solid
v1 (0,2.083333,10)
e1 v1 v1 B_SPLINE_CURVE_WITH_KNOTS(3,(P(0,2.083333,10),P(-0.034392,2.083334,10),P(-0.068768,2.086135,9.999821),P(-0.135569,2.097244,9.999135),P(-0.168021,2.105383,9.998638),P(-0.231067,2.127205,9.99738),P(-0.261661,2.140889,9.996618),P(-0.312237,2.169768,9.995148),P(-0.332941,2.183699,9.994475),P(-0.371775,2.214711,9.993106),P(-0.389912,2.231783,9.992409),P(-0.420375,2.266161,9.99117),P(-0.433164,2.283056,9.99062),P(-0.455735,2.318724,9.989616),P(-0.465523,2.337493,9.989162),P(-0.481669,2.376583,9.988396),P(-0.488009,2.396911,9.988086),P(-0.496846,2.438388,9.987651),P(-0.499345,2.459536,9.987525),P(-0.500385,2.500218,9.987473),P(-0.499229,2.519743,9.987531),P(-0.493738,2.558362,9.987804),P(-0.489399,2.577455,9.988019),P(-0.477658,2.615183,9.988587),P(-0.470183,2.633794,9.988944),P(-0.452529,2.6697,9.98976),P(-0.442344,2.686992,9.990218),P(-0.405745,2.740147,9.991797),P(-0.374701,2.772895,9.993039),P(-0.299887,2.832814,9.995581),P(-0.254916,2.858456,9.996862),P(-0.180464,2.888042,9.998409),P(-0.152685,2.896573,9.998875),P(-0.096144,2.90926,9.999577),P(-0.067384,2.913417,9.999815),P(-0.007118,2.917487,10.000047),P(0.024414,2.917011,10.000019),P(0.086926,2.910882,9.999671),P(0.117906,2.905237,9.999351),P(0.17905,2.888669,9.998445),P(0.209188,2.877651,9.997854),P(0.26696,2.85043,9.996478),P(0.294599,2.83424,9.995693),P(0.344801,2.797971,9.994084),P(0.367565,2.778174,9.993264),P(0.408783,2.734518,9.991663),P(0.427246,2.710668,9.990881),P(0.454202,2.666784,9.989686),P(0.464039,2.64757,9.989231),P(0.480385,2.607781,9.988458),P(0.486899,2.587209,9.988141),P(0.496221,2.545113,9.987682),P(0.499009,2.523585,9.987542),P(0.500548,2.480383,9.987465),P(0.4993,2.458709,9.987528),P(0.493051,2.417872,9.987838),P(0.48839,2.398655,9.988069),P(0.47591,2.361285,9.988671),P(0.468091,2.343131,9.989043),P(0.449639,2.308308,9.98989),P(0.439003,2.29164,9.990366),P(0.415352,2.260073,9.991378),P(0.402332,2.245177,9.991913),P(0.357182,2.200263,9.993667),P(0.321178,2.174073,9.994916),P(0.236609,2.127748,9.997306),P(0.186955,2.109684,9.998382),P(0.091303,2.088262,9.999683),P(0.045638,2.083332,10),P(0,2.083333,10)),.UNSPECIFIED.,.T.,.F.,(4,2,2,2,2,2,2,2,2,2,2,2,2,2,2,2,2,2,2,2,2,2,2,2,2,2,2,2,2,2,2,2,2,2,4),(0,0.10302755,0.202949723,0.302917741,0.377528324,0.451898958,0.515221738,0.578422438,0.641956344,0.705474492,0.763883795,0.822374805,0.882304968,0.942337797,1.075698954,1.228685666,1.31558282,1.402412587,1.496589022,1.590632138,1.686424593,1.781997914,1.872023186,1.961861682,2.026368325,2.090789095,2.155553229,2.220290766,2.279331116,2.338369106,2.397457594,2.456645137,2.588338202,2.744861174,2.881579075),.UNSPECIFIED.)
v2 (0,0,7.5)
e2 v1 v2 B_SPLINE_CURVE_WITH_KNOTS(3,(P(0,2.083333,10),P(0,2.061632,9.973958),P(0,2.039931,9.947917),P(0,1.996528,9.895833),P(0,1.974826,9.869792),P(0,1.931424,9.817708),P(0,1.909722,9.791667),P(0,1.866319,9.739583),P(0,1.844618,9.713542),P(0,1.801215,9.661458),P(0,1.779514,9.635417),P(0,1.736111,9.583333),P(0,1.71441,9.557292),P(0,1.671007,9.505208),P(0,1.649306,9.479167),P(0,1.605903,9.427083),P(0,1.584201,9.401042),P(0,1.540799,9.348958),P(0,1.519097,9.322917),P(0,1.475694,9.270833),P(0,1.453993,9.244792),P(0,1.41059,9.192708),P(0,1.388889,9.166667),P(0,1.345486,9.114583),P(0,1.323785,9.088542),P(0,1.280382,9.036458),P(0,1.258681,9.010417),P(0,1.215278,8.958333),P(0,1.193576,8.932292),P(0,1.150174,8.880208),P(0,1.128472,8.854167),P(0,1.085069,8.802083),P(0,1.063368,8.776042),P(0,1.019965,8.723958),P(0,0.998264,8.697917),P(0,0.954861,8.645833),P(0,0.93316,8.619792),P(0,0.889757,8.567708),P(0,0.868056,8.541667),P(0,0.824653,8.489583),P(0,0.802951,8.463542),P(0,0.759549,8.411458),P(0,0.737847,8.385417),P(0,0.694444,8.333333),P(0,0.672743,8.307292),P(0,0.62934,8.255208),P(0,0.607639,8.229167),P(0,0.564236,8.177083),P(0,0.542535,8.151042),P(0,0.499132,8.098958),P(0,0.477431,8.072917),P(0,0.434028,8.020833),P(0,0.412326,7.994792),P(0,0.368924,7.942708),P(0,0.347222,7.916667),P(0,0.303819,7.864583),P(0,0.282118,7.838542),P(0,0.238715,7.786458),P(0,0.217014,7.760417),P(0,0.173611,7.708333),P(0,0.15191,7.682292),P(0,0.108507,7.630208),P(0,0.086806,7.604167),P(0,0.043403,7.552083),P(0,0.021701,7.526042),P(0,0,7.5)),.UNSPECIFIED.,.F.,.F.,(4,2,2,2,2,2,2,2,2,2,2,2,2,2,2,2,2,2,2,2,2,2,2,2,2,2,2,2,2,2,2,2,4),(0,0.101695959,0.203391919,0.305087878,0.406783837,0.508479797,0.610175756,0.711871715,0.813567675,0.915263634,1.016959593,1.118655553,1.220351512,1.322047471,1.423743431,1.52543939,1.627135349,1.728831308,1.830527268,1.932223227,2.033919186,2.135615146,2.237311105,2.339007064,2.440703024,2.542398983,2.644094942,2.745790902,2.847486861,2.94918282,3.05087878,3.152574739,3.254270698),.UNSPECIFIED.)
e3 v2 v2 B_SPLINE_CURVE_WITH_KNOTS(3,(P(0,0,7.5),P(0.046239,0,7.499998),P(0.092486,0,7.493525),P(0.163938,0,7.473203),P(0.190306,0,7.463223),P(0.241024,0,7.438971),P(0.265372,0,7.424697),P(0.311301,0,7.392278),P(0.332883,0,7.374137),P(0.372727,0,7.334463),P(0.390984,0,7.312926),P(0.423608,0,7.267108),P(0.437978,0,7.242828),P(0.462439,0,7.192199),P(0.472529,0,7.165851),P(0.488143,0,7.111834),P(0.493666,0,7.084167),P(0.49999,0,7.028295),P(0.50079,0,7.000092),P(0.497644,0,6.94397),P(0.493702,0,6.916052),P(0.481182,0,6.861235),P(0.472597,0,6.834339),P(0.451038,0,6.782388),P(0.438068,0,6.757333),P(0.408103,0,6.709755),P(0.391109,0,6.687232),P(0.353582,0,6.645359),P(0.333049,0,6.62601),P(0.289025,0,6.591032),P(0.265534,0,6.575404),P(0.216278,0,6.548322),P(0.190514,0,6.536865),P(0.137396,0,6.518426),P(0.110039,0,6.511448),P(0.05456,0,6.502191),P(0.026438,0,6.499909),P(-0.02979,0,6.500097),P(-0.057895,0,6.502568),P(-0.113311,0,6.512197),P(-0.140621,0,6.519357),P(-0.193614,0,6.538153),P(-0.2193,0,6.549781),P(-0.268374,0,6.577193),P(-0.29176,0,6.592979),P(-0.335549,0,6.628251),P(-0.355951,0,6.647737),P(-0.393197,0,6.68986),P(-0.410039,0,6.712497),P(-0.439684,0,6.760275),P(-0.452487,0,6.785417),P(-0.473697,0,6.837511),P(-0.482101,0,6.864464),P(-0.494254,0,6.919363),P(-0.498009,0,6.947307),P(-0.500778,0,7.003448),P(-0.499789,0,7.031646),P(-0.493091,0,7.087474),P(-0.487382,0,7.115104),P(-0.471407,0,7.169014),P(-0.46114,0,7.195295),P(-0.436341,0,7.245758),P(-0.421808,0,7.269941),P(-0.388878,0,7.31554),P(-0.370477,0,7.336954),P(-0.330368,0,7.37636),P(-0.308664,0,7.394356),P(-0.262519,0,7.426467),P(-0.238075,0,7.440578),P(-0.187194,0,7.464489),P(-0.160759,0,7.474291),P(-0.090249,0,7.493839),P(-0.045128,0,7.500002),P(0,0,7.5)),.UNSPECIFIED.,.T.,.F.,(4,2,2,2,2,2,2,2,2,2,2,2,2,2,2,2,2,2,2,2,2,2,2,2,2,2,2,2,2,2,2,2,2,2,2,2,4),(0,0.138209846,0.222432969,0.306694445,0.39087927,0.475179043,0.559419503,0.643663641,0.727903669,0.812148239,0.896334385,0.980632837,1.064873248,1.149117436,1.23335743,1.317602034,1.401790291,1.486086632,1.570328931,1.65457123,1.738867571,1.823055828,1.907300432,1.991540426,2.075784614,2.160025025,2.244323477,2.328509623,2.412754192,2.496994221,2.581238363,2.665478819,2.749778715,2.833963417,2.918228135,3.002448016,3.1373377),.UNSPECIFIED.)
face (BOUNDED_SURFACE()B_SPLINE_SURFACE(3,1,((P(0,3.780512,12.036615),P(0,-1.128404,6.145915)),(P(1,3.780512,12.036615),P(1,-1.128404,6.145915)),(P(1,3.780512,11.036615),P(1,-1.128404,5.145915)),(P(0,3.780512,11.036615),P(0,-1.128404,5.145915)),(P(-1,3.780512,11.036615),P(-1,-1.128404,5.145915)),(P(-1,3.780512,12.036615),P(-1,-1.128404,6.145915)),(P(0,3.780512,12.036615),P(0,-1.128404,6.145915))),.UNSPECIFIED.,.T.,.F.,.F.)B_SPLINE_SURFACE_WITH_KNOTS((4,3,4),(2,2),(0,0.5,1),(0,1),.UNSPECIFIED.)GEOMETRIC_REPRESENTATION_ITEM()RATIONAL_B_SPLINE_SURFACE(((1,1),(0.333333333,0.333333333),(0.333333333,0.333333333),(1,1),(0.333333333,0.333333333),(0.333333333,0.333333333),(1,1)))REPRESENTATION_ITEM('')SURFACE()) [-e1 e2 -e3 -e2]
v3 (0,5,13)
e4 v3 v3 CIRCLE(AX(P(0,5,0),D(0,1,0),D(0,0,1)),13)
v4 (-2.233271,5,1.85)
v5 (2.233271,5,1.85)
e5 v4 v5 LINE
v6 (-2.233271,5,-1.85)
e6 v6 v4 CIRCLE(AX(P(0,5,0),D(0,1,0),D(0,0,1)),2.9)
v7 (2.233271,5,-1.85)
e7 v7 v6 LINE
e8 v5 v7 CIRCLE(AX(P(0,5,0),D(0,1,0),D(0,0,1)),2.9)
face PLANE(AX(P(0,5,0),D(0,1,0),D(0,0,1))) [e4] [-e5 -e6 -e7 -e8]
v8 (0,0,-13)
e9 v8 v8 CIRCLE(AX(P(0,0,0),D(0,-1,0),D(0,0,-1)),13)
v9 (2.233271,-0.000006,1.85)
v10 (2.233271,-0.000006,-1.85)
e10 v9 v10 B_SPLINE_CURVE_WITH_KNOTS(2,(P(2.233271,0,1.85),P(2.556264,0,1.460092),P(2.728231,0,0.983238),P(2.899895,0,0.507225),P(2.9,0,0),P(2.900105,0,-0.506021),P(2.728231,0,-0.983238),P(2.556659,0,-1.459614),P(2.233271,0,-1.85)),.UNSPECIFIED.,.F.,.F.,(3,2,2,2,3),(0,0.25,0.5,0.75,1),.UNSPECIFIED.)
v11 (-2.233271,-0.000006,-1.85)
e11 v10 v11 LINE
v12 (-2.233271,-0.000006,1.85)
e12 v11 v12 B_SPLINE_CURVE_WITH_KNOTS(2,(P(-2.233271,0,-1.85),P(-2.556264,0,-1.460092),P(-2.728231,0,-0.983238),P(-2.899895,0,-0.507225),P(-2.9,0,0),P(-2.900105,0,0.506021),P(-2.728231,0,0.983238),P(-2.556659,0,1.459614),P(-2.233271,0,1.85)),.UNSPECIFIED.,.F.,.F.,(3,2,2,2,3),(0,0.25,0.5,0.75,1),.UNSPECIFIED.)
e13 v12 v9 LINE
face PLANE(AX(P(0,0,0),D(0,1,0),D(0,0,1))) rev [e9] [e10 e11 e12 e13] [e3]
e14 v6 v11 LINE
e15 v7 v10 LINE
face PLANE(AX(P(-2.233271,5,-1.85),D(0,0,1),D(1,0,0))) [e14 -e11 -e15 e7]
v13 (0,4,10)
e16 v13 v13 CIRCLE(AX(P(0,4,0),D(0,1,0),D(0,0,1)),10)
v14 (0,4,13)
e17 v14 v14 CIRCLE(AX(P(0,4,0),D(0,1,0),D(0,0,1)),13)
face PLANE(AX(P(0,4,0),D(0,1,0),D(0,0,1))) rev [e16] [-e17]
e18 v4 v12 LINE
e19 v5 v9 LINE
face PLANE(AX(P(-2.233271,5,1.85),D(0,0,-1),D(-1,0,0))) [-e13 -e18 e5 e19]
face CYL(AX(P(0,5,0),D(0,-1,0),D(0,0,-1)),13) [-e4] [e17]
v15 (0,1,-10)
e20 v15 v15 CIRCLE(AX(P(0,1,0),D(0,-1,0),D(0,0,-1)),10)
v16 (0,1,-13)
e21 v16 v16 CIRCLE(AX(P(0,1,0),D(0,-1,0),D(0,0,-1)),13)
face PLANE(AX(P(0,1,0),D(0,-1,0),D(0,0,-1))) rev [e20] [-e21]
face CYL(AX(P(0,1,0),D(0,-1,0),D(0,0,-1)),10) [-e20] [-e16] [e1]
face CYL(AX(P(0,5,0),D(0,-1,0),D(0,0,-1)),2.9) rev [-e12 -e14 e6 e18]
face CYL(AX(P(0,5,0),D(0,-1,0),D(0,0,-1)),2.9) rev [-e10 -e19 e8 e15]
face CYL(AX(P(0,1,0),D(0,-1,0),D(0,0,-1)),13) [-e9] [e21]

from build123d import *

# Parameters (mm, degrees)
SKETCH1_R               = 10
BOSS_EXTRUDE1_DEPTH     = 1
SKETCH2_R               = 10
BOSS_EXTRUDE2_DEPTH     = 4
SKETCH4_R               = 13
BOSS_EXTRUDE3_DEPTH     = 1
CUT_SWEEP1_START        = 4.993438222
CUT_SWEEP1_DEPTH        = 4.55597903
SKETCH9_R               = 1
CUT_EXTRUDE2_DEPTH      = 5
SKETCH10_R              = 2.5
SKETCH10_R_2            = 1
BOSS_EXTRUDE4_DEPTH     = 1
SKETCH11_R              = 13
SKETCH11_R_2            = 10
BOSS_EXTRUDE5_DEPTH     = 1
CUT_EXTRUDE4_DEPTH      = 20.05255902
CUT_EXTRUDE4_DEPTH_BACK = 20.05255902


# Read off the part's stored shape, not the designer's step: Cut-Sweep1
with BuildPart() as part:
    # Sketch1 → Boss-Extrude1 (new body)
    with BuildSketch(Plane(origin=(0, 0, 0), x_dir=(1, 0, 0), z_dir=(0, 1, 0))):
        with Locations(Location((0, 0, 0), (0, 0, 270))):
            Circle(SKETCH1_R)
    extrude(amount=BOSS_EXTRUDE1_DEPTH)

    # Sketch2 → Boss-Extrude2 (add)
    with BuildSketch(Plane(origin=(0, 0, 0), x_dir=(1, 0, 0), z_dir=(0, 1, 0))):
        with Locations(Location((0, 0, 0), (0, 0, 270))):
            Circle(SKETCH2_R)
    extrude(amount=BOSS_EXTRUDE2_DEPTH)

    # Sketch4 → Boss-Extrude3 (add)
    with BuildSketch(Plane(origin=(0, 4, 0), x_dir=(1, 0, 0), z_dir=(0, 1, 0))):
        with Locations(Location((0, 0, 0), (0, 0, 270))):
            Circle(SKETCH4_R)
    extrude(amount=BOSS_EXTRUDE3_DEPTH)

    # Cut-Sweep1 outline → Cut-Sweep1 (cut)
    with BuildSketch(Plane(origin=(0, 0, 0), x_dir=(1, 0, 0), z_dir=(0, 0.6401843996644766, 0.7682212795973786)).offset(CUT_SWEEP1_START)):
        with BuildLine():
            add(Edge.make_bspline(
                [(0, -4.801382997), (1, -4.801382997), (1, -4.161198598), (0, -4.161198598), (-1, -4.161198598), (-1, -4.801382997), (0, -4.801382997)],
                knots=[0, 0, 0, 0, 0.5, 0.5, 0.5, 1, 1, 1, 1], degree=3, weights=[1, 0.333333333, 0.333333333, 1, 0.333333333, 0.333333333, 1]))
        make_face()
    extrude(amount=CUT_SWEEP1_DEPTH, mode=Mode.SUBTRACT)

    # Sketch9 → Cut-Extrude2 (cut)
    with BuildSketch(Plane(origin=(0, 0, 0), x_dir=(1, 0, 0), z_dir=(0, 1, 0))):
        with Locations(Location((0, 0, 0), (0, 0, 270))):
            Circle(SKETCH9_R)
    extrude(amount=CUT_EXTRUDE2_DEPTH, mode=Mode.SUBTRACT)

    # Sketch10 → Boss-Extrude4 (add)
    with BuildSketch(Plane(origin=(0, 0, 0), x_dir=(1, 0, 0), z_dir=(0, 1, 0))):
        Circle(SKETCH10_R)
        with Locations(Location((0, 0, 0), (0, 0, 270))):
            Circle(SKETCH10_R_2, mode=Mode.SUBTRACT)
    extrude(amount=BOSS_EXTRUDE4_DEPTH)

    # Sketch11 → Boss-Extrude5 (add)
    with BuildSketch(Plane(origin=(0, 0, 0), x_dir=(-1, 0, 0), z_dir=(0, -1, 0))):
        with Locations(Location((0, 0, 0), (0, 0, 270))):
            Circle(SKETCH11_R)
        with Locations(Location((0, 0, 0), (0, 0, 90))):
            Circle(SKETCH11_R_2, mode=Mode.SUBTRACT)
    extrude(amount=-BOSS_EXTRUDE5_DEPTH)

    # Sketch12 → Cut-Extrude4 (cut, two sides: drawn at the far end of the back side and taken through both)
    with BuildSketch(Plane(origin=(0, 0, 0), x_dir=(1, 0, 0), z_dir=(0, 1, 0)).offset(-CUT_EXTRUDE4_DEPTH_BACK)):
        with BuildLine():
            Line((-2.233271143, 1.85), (2.233271143, 1.85))
            ThreePointArc((2.233271143, 1.85), (2.9, 0), (2.233271143, -1.85))
            Line((2.233271143, -1.85), (-2.233271143, -1.85))
            ThreePointArc((-2.233271143, -1.85), (-2.9, 0), (-2.233271143, 1.85))
        make_face()
    extrude(amount=CUT_EXTRUDE4_DEPTH + CUT_EXTRUDE4_DEPTH_BACK, mode=Mode.SUBTRACT)


solid = part.part
